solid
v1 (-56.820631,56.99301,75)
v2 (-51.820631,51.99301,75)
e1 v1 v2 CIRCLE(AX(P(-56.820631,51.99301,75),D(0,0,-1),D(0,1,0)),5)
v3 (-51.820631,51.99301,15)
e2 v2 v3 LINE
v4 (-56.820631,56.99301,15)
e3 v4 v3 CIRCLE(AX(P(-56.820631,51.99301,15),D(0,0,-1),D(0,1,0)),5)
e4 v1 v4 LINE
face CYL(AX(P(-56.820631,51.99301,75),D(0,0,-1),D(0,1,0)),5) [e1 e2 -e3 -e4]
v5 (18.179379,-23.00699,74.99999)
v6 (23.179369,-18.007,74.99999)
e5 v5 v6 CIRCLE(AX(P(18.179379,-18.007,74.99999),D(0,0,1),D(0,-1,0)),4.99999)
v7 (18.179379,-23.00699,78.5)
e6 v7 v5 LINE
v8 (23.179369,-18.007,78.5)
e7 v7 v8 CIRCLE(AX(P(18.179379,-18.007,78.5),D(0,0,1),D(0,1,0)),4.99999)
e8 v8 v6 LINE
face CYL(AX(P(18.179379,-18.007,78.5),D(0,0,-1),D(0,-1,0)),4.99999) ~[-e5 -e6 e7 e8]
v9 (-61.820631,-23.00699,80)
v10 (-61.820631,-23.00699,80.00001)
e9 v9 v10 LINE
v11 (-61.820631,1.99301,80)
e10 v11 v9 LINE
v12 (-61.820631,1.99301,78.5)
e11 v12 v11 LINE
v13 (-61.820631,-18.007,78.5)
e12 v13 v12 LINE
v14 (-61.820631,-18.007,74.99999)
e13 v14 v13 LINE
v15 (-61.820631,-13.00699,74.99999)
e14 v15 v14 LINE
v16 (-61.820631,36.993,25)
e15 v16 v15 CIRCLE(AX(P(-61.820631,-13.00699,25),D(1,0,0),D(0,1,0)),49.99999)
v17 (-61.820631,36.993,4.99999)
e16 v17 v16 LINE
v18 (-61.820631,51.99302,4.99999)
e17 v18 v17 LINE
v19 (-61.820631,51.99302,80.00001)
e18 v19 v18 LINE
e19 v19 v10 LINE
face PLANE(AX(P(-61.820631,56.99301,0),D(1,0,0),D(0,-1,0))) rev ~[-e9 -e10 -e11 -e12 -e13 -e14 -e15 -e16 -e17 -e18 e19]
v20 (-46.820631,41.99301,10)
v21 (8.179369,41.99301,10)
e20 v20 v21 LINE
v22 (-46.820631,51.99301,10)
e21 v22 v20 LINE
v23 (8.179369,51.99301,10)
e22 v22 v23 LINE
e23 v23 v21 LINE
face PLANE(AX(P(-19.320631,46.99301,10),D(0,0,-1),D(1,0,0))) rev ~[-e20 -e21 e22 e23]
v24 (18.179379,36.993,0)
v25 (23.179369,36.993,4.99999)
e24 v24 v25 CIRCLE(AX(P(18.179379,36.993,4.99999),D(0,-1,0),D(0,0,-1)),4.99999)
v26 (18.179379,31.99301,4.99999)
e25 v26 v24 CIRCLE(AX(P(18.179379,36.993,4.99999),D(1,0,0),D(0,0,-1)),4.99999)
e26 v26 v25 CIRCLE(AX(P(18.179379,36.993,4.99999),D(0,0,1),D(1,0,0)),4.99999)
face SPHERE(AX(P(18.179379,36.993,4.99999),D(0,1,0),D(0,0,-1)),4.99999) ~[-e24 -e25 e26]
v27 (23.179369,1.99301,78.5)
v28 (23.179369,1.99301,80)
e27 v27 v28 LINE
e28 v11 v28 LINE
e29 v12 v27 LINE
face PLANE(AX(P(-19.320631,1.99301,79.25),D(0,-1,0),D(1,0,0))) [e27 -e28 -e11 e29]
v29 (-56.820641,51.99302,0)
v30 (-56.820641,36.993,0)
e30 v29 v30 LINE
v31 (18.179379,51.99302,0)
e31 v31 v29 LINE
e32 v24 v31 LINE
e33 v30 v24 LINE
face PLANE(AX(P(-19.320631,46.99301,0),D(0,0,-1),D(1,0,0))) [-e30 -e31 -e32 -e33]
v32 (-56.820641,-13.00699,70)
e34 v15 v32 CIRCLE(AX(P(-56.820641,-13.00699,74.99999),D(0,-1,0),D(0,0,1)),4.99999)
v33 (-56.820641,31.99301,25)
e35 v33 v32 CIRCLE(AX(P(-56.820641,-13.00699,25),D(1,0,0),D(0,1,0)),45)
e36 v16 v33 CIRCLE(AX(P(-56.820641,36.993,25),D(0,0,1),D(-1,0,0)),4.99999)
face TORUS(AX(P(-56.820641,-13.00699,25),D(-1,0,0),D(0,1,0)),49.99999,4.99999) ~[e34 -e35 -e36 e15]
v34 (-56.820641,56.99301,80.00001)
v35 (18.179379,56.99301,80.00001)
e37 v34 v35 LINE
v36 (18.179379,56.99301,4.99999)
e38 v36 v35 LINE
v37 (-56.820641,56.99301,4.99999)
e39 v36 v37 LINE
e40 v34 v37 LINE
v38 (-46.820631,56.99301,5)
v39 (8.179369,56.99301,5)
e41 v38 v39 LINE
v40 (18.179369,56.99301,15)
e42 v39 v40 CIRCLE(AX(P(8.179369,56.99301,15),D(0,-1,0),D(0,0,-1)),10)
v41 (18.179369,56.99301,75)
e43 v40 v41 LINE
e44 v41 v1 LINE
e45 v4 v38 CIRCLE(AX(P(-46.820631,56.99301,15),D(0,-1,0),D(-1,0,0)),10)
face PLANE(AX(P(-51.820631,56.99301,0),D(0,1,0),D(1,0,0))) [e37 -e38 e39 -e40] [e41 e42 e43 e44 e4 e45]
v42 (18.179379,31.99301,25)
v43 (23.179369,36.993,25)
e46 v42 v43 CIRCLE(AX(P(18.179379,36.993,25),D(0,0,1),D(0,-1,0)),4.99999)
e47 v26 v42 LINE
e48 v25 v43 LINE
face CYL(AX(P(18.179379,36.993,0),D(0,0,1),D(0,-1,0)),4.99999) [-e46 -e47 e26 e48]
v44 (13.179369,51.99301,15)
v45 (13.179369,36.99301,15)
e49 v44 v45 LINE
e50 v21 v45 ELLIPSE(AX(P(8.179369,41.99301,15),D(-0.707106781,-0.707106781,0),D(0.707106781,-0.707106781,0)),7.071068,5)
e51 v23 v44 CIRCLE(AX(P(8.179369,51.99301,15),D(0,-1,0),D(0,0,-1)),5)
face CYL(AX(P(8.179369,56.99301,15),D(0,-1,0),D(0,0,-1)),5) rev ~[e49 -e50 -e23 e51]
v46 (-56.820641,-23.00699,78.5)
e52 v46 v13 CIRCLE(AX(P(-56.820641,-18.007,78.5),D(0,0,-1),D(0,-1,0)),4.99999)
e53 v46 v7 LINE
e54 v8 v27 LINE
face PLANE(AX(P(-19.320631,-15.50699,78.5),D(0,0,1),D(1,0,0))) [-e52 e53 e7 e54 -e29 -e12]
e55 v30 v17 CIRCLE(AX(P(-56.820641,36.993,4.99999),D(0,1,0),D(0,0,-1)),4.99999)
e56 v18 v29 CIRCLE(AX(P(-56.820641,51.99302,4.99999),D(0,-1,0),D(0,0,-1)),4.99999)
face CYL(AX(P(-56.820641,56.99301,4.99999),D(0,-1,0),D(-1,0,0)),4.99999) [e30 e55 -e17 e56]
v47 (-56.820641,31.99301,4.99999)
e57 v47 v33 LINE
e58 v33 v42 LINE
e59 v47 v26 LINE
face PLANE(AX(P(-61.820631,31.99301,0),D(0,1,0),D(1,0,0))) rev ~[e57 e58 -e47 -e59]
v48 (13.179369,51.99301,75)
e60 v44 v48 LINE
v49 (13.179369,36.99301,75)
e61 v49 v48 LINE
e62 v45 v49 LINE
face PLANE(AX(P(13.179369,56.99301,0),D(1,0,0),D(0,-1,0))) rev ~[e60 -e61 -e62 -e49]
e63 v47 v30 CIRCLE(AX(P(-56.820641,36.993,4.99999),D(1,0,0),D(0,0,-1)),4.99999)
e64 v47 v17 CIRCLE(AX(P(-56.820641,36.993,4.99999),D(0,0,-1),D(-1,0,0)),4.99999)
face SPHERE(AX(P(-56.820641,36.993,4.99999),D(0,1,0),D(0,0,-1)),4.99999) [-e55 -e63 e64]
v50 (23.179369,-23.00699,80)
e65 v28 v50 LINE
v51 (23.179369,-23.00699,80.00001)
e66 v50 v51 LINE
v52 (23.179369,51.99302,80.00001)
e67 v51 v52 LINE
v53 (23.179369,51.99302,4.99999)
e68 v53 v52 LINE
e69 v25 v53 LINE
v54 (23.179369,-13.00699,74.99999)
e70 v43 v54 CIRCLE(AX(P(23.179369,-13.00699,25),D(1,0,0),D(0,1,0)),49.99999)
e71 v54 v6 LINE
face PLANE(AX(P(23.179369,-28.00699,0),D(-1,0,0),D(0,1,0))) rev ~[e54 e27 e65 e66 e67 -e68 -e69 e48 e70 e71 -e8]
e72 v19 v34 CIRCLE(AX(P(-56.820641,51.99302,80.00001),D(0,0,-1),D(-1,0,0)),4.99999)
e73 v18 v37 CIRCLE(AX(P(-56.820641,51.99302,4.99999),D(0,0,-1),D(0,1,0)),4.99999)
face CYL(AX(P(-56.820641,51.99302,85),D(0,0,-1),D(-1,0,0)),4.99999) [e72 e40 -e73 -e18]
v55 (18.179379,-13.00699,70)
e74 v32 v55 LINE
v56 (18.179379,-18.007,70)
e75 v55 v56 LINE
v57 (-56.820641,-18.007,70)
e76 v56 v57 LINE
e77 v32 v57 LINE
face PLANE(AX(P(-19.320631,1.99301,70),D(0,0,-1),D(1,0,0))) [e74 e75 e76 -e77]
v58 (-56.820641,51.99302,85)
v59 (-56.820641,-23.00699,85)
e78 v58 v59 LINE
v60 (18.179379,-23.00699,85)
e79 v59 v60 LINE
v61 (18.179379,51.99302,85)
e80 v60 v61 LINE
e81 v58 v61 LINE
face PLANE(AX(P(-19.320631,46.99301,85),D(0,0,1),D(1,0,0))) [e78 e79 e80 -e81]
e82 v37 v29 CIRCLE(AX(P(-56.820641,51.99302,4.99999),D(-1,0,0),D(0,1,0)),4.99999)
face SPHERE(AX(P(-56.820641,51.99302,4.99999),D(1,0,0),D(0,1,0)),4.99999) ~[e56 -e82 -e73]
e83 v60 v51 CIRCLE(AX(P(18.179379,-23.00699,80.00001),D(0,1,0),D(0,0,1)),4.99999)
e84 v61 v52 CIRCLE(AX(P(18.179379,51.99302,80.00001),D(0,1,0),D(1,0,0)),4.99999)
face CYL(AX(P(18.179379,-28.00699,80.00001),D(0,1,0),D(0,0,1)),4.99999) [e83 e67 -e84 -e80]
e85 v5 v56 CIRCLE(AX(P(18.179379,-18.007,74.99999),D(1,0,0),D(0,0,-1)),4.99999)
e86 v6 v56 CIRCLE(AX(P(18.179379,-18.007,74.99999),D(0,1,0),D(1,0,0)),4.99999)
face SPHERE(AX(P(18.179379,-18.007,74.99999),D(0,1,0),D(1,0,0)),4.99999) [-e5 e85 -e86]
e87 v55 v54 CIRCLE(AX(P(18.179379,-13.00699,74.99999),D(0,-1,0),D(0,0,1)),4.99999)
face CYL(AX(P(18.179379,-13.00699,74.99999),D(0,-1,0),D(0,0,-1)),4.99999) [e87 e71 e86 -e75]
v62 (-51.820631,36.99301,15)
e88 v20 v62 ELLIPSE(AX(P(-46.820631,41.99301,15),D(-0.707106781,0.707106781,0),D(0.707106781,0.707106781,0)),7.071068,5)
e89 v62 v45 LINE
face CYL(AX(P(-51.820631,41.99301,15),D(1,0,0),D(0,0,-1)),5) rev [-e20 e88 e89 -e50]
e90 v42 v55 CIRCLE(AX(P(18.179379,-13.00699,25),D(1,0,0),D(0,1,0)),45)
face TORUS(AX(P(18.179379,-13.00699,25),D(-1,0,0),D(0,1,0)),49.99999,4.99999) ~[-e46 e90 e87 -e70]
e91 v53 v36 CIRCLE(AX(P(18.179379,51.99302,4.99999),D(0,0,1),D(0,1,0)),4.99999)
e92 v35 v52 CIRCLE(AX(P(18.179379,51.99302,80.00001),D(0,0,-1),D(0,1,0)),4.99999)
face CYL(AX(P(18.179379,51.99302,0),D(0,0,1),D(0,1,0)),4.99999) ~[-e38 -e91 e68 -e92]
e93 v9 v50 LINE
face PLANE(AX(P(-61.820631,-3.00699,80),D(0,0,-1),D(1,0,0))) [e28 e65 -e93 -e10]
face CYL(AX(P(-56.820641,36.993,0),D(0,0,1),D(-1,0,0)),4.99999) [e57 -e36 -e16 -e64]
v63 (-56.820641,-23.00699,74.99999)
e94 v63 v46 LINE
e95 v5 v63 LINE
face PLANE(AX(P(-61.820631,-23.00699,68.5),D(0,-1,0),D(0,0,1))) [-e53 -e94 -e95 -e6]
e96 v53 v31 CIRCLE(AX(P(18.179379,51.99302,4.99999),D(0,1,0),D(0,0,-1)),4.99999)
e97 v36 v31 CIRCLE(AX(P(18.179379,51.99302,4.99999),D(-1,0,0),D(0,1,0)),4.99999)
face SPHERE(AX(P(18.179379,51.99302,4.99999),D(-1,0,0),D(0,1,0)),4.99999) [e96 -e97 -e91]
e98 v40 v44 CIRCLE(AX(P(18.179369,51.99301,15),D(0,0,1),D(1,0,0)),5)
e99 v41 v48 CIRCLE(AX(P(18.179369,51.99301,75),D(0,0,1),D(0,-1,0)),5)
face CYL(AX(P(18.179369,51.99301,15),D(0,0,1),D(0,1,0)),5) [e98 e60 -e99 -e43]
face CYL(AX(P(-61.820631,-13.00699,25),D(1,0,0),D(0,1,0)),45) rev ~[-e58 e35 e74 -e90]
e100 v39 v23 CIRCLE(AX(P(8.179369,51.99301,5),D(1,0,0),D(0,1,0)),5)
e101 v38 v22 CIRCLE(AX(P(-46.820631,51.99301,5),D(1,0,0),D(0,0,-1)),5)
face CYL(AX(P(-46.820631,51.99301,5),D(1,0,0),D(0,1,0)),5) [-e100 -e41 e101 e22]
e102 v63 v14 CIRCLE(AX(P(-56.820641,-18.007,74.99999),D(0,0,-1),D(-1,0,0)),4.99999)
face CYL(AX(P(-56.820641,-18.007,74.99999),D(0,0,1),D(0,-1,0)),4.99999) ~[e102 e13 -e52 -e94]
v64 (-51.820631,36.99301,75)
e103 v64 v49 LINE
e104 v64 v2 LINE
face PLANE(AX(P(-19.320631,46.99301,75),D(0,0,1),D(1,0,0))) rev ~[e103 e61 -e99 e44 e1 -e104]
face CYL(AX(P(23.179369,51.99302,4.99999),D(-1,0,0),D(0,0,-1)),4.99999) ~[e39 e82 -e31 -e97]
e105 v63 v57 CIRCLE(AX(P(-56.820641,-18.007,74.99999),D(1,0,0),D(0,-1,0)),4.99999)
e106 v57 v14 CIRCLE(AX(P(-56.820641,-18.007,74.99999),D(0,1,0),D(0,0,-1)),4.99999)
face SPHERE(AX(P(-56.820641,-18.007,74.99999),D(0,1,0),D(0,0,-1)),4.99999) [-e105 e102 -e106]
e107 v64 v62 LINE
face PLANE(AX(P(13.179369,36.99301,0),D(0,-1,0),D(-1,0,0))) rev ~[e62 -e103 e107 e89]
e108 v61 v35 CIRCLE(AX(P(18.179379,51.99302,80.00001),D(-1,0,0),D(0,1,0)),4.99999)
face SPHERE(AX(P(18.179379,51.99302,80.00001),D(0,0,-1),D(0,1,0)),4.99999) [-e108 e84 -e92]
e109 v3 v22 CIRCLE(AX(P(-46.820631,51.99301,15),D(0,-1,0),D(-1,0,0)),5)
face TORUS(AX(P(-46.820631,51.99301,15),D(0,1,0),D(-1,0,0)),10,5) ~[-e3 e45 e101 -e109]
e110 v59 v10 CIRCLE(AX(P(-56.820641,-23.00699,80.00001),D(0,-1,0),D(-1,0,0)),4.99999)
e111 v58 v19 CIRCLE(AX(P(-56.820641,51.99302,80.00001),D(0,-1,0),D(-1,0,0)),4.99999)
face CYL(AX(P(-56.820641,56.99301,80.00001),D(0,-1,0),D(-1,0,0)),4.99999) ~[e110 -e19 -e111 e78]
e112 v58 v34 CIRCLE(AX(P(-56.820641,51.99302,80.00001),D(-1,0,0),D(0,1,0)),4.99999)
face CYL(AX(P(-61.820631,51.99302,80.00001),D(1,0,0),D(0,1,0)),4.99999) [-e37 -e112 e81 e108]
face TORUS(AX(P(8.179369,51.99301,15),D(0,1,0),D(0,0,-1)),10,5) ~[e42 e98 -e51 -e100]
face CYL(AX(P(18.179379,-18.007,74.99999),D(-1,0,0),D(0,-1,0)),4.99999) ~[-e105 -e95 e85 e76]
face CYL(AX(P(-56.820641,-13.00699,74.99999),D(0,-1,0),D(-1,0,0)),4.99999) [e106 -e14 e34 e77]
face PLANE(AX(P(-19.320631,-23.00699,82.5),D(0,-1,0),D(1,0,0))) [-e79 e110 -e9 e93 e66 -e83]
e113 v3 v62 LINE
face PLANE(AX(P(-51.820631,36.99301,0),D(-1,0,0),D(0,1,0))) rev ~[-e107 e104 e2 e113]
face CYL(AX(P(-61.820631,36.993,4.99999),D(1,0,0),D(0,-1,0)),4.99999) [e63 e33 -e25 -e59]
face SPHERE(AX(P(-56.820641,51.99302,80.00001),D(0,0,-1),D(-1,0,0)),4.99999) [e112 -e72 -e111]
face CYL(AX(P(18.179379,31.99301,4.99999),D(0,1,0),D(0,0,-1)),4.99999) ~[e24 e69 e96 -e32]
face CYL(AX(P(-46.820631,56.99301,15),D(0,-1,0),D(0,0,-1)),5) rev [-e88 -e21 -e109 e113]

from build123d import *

# Parameters (mm, degrees)
F1_DEPTH  = 60
F2_DEPTH  = 85
F3_W      = 65
F3_H      = 20
F4_DEPTH  = 10
F5_W      = 65
F5_H      = 20
F6_DEPTH  = 10
F9_W      = 85
F9_H      = 25
F10_DEPTH = 1.5
F11_F1_R  = 5
F11_F2_R  = 5
F12_W     = 85
F12_H     = 60
F13_DEPTH = 70
F14_R     = 45
F15_R     = 4.99999
F16_R     = 4.99999
F17_W     = 85
F17_H     = 1.5
F18_DEPTH = 5
F19_W     = 85
F19_H     = 5
F20_DEPTH = 5
F21_W     = 5
F21_H     = 10
F22_DEPTH = 85
F23_R     = 4.99999


# Not quite as in the source:
# - a fillet or chamfer is up to 0.001 mm smaller than in the source, because OpenCascade refuses the exact size


with BuildPart() as f1:
    # F0 (on Top) → F1 (new body)
    with BuildSketch(Plane.XY):
        Polygon((-61.8206309527, 56.9930104911), (-61.8206309527, -28.0069895089), (23.1793690473, -28.0069895089), (23.1793690473, 56.9930104911), (13.1793690473, 56.9930104911), (13.1793690473, 36.9930104911), (-51.8206309527, 36.9930104911), (-51.8206309527, 56.9930104911), align=None)
    extrude(amount=F1_DEPTH)

    # F0 (on Top) → F2 (join)
    with BuildSketch(Plane.XY):
        Polygon((-61.8206309527, 56.9930104911), (-61.8206309527, -28.0069895089), (23.1793690473, -28.0069895089), (23.1793690473, 56.9930104911), (13.1793690473, 56.9930104911), (13.1793690473, 36.9930104911), (-51.8206309527, 36.9930104911), (-51.8206309527, 56.9930104911), align=None)
    extrude(amount=F2_DEPTH)

    # F3 (on face) → F4 (join)
    with BuildSketch(Plane.XY.offset(85)):
        with Locations((-19.3206309527, 46.9930104911)):
            Rectangle(F3_W, F3_H)
    extrude(amount=-F4_DEPTH)

    # F5 (on face) → F6 (join)
    with BuildSketch(Plane(origin=(0, 0, 0), x_dir=(1, 0, 0), z_dir=(0, 0, -1))):
        with Locations((-19.3206309527, -46.9930104911)):
            Rectangle(F5_W, F5_H)
    extrude(amount=-F6_DEPTH)

    # F9 (on offset) → F10 (cut)
    with BuildSketch(Plane.XY.offset(80)):
        with Locations((-19.3206309527, -15.5069895089)):
            Rectangle(F9_W, F9_H)
    extrude(amount=-F10_DEPTH, mode=Mode.SUBTRACT)

    # F11: fillet of radius 5 on 4 edges, made by hand

    # F11_f1
    f11_f1_edges = [f1.edges().sort_by_distance(p)[0] for p in [
        (13.1793690473, 46.9930104911, 10),
        (-19.3206309527, 36.9930104911, 10),
        (-51.8206309527, 46.9930104911, 10),
    ]]
    fillet(f11_f1_edges, radius=F11_F1_R)

    # F11_f2
    f11_f2_edges = [f1.edges().sort_by_distance(p)[0] for p in [
        (-19.3206309527, 56.9930104911, 10),
        (-50.3561648586, 56.9930104911, 11.4644660941),
        (11.7149029532, 56.9930104911, 11.4644660941),
    ]]
    fillet(f11_f2_edges, radius=F11_F2_R)

    # F12 (on face) → F13 (cut)
    with BuildSketch(Plane(origin=(0, 0, 0), x_dir=(1, 0, 0), z_dir=(0, 0, -1))):
        with Locations((-19.3206309527, -1.9930104911)):
            Rectangle(F12_W, F12_H)
    extrude(amount=-F13_DEPTH, mode=Mode.SUBTRACT)

    # F14
    f14_edges = [f1.edges().sort_by_distance(p)[0] for p in [
        (-19.320631, 31.99301, 70),
    ]]
    fillet(f14_edges, radius=F14_R)

    # F15 (radius 5 in the source; OpenCascade refuses exactly that, so slightly less here)
    f15_edges = [f1.edges().sort_by_distance(p)[0] for p in [
        (-19.320631, 56.99301, 0),
        (-61.820631, 56.99301, 42.5),
        (23.179369, 56.99301, 42.5),
        (-61.820631, 44.49301, 0),
        (23.179369, 44.49301, 0),
        (-19.320631, 31.99301, 0),
        (-61.820631, -20.50699, 70),
        (23.179369, 18.812816, 56.819805),
        (-61.820631, 31.99301, 12.5),
        (-61.820631, 18.812816, 56.819805),
        (-61.820631, 14.49301, 85),
        (23.179369, 31.99301, 12.5),
        (23.179369, -20.50699, 70),
        (-19.320631, 56.99301, 85),
        (23.179369, 14.49301, 85),
    ]]
    fillet(f15_edges, radius=F15_R)

    # F16 (radius 5 in the source; OpenCascade refuses exactly that, so slightly less here)
    f16_edges = [f1.edges().sort_by_distance(p)[0] for p in [
        (-19.320631, 51.99302, 0),
        (18.179379, 44.49301, 0),
        (-56.820641, 44.49301, 0),
        (-19.320631, 36.993, 0),
        (-19.320631, -28.00699, 70),
    ]]
    fillet(f16_edges, radius=F16_R)

    # F17 (on face) → F18 (cut)
    with BuildSketch(Plane.XZ.offset(3.0069895089)):
        with Locations((-19.3206309527, 79.25)):
            Rectangle(F17_W, F17_H)
    extrude(amount=-F18_DEPTH, mode=Mode.SUBTRACT)

    # F19 (on face) → F20 (cut)
    with BuildSketch(Plane.XZ.offset(28.0069895089)):
        with Locations((-19.3206309527, 82.5)):
            Rectangle(F19_W, F19_H)
    extrude(amount=-F20_DEPTH, mode=Mode.SUBTRACT)

    # F21 (on face) → F22 (cut)
    with BuildSketch(Plane(origin=(-61.8206309527, 0, 0), x_dir=(0, -1, 0), z_dir=(-1, 0, 0))):
        with Locations((25.5069895089, 73.5)):
            Rectangle(F21_W, F21_H)
    extrude(amount=-F22_DEPTH, mode=Mode.SUBTRACT)

    # F23 (radius 5 in the source; OpenCascade refuses exactly that, so slightly less here)
    f23_edges = [f1.edges().sort_by_distance(p)[0] for p in [
        (-19.320631, -23.00699, 70),
        (-61.820631, -23.00699, 76.749995),
        (-60.356168, -23.00699, 71.464463),
        (21.714906, -23.00699, 71.464463),
        (23.179369, -23.00699, 76.749995),
    ]]
    fillet(f23_edges, radius=F23_R)


solid = f1.part
